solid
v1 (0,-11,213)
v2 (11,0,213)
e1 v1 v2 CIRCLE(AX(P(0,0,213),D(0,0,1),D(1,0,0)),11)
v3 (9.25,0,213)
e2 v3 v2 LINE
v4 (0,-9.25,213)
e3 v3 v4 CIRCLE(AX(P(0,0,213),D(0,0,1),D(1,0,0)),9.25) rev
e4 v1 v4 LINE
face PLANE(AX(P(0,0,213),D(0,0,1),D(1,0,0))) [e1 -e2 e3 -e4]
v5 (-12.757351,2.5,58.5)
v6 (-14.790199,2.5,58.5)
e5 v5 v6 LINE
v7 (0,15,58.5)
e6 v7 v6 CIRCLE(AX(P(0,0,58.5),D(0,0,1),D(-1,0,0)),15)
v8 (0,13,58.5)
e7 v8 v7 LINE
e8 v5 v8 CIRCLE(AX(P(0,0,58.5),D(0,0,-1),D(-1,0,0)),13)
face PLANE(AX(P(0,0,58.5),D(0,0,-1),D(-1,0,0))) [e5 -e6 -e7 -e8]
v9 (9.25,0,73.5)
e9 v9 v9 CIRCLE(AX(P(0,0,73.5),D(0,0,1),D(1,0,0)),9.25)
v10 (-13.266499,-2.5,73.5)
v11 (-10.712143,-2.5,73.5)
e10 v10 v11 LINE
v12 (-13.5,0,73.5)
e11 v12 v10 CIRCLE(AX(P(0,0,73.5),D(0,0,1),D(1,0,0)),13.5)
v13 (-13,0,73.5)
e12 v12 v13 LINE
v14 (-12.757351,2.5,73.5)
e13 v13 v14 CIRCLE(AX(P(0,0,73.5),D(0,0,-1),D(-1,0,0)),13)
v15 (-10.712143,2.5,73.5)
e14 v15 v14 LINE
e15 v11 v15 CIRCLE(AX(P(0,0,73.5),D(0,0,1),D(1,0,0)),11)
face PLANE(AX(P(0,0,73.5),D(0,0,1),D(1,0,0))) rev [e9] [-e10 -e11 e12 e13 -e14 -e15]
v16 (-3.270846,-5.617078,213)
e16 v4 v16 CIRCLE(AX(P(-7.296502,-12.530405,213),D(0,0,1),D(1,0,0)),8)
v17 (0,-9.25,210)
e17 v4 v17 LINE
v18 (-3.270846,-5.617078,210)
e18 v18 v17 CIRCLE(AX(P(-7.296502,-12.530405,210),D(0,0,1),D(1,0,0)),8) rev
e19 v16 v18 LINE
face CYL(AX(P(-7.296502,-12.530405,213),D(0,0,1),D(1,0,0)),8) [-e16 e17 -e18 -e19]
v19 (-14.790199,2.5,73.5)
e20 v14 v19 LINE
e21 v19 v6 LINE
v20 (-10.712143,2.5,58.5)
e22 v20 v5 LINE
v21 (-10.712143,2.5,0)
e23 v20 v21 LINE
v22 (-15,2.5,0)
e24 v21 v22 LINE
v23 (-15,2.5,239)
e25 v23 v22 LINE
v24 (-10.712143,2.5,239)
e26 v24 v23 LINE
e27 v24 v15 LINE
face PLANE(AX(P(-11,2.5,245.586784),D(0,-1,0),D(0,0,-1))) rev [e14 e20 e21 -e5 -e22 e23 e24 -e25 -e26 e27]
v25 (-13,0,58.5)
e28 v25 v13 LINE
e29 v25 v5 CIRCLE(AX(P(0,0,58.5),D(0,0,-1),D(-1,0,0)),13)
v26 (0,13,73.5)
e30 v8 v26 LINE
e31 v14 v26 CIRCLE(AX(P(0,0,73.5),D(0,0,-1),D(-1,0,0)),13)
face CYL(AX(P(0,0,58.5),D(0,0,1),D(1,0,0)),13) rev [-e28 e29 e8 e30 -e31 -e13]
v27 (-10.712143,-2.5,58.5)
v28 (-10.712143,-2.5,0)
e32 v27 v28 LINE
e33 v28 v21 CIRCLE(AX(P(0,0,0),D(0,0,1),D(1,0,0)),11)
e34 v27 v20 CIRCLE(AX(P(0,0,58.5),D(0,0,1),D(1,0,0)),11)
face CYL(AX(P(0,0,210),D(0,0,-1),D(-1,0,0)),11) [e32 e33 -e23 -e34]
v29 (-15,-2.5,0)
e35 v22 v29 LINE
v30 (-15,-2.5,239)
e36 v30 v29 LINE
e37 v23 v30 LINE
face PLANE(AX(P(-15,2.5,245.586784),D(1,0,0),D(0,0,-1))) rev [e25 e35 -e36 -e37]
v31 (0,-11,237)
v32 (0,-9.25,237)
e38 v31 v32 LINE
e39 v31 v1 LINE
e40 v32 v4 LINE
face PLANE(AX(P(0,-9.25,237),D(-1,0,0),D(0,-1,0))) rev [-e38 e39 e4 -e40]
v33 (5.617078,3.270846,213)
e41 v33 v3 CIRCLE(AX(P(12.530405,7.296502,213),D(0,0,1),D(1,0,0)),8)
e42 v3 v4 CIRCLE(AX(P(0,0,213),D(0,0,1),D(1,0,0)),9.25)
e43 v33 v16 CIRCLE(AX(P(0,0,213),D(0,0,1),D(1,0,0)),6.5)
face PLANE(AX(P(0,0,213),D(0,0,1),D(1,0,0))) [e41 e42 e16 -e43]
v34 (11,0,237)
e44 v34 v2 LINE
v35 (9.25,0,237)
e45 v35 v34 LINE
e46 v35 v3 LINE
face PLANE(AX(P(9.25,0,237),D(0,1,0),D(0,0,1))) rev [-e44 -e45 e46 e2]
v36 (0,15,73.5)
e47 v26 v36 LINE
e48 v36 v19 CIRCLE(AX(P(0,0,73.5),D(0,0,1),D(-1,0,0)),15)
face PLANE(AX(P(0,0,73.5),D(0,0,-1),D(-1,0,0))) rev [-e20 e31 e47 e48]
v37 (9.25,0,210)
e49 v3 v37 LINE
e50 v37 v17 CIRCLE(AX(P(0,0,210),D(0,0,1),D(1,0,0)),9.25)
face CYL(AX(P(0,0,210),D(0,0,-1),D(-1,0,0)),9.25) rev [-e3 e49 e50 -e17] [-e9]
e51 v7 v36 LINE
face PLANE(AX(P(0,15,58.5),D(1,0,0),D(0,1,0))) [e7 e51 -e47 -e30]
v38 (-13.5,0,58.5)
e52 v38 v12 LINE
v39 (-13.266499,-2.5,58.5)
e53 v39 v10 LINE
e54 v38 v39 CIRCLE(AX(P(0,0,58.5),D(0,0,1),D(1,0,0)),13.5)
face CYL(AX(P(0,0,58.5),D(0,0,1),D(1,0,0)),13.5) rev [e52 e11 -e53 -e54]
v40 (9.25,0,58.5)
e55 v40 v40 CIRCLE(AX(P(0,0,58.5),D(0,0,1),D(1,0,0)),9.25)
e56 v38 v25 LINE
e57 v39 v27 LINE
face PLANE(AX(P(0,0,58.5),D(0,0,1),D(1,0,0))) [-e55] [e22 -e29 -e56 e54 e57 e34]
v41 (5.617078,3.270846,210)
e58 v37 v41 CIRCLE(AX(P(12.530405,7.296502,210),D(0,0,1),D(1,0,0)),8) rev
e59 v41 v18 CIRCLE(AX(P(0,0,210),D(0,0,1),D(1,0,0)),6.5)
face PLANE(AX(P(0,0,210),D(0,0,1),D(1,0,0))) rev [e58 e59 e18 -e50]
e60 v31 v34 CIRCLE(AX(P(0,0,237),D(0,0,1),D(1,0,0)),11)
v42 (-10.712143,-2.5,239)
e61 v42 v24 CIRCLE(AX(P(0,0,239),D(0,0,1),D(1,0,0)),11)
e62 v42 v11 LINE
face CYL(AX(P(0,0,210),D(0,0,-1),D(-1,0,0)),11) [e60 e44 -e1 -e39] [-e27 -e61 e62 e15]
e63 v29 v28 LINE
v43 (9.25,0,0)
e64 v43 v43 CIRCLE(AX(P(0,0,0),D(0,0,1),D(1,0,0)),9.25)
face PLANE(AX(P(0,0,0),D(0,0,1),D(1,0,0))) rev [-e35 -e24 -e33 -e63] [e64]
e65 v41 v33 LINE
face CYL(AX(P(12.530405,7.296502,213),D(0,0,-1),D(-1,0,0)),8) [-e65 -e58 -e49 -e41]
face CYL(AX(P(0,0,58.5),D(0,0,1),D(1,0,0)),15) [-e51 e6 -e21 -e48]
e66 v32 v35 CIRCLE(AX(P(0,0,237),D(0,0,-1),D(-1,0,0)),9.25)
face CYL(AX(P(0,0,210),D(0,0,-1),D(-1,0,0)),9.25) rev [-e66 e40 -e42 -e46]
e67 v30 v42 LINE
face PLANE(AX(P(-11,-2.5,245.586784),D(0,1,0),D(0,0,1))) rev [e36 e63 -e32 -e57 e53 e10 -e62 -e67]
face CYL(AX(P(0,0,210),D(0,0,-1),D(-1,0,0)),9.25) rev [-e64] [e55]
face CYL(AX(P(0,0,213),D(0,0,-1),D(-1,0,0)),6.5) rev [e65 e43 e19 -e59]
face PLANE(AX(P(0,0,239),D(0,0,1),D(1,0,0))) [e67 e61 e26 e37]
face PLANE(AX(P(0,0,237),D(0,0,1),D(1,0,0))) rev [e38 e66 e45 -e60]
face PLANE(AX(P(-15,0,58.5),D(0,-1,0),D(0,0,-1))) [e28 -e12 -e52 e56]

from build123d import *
from build123d.topology import SkipClean

# Parameters (mm, degrees)
SCHIZZO1_R                    = 11
SCHIZZO1_R_2                  = 9.25
TUBO_DEPTH                    = 210
INGRESSOCAVI_DEPTH            = 27
SCHIZZO4_R                    = 11
SCHIZZO4_R_2                  = 6.5
FONDOCORSA_DEPTH              = 3
SCHIZZO5_R                    = 11
TAPPO_DEPTH                   = 2
BASEINFERIORE_DEPTH           = 239
SCHIZZO7_R                    = 13.5
TAGLIOANELLO_DEPTH            = 15
SUPPORTOANELLO_DEPTH          = 15
FACILITAZIONEUSCITACAVI_DEPTH = 3
RACCORDOFACILITAZIONECAVI_R   = 8


with BuildPart() as part:
    # Schizzo1 → Tubo (new body)
    with BuildSketch(Plane.XY):
        Circle(SCHIZZO1_R)
        Circle(SCHIZZO1_R_2, mode=Mode.SUBTRACT)
    extrude(amount=TUBO_DEPTH)

    # Schizzo2 → IngressoCavi (add)
    with BuildSketch(Plane.XY.offset(210)):
        with BuildLine():
            Line((0, -9.25), (0, -11))
            ThreePointArc((0, -11), (-7.778174593, 7.778174593), (11, 0))
            Line((11, 0), (9.25, 0))
            ThreePointArc((9.25, 0), (-6.540737726, 6.540737726), (0, -9.25))
        make_face()
    extrude(amount=INGRESSOCAVI_DEPTH)

    # Schizzo4 → FondoCorsa (add)
    with SkipClean():  # the faces are left unmerged after this step: merging them gives an invalid solid
        with BuildSketch(Plane.XY.offset(210)):
            Circle(SCHIZZO4_R)
            Circle(SCHIZZO4_R_2, mode=Mode.SUBTRACT)
        extrude(amount=FONDOCORSA_DEPTH)

    # Schizzo5 → Tappo (add)
    with SkipClean():  # the faces are left unmerged after this step: merging them gives an invalid solid
        with BuildSketch(Plane.XY.offset(237)):
            Circle(SCHIZZO5_R)
        extrude(amount=TAPPO_DEPTH)
    add(part.part.scale(1), mode=Mode.REPLACE)  # the faces are merged on a copy

    # Schizzo6 → BaseInferiore (add)
    with SkipClean():  # the faces are left unmerged after this step: merging them gives an invalid solid
        with BuildSketch(Plane.XY):
            Polygon((-11, 2.5), (-15, 2.5), (-15, -2.5), (-11, -2.5), (-10.712142643, -2.5), (-10.712142643, 2.5), align=None)
        extrude(amount=BASEINFERIORE_DEPTH)

    # Schizzo7 → TaglioAnello (cut)
    with BuildSketch(Plane.XY.offset(73.5)):
        Circle(SCHIZZO7_R)
    extrude(amount=-TAGLIOANELLO_DEPTH, mode=Mode.SUBTRACT)

    # Schizzo8 → SupportoAnello (add)
    with SkipClean():  # the faces are left unmerged after this step: merging them gives an invalid solid
        with BuildSketch(Plane.XY.offset(73.5)):
            with BuildLine():
                Line((0, 15), (0, 13))
                ThreePointArc((0, 13), (-9.192388155, 9.192388155), (-13, 0))
                Line((-13, 0), (-15, 0))
                ThreePointArc((-15, 0), (-10.606601718, 10.606601718), (0, 15))
            make_face()
        extrude(amount=-SUPPORTOANELLO_DEPTH)

    # Schizzo9 → FacilitazioneUscitaCavi (cut)
    with SkipClean():  # the faces are left unmerged after this step: merging them gives an invalid solid
        with BuildSketch(Plane(origin=(0, 0, 210), x_dir=(-1, 0, 0), z_dir=(0, 0, -1))):
            with BuildLine():
                Line((0, 0), (-9.25, 0))
                ThreePointArc((-9.25, 0), (-6.540737726, -6.540737726), (0, -9.25))
                Line((0, -9.25), (0, 0))
            make_face()
        extrude(amount=-FACILITAZIONEUSCITACAVI_DEPTH, mode=Mode.SUBTRACT)

    # RaccordoFacilitazioneCavi
    # the kernel refuses this fillet: 8 mm, written as the material it takes off along each edge
    with BuildSketch(Plane(origin=(6.5, 0, 201.530207244), x_dir=(1, 0, 0), z_dir=(0, 0, 1)), Plane(origin=(0, -6.5, 221.469792756), x_dir=(0, -1, 0), z_dir=(0, 0, -1))) as raccordofacilitazionecavi_piece_1:
        with BuildLine():
            CenterArc((6.030405405, 7.296501927), RACCORDOFACILITAZIONECAVI_R, 210.212403153, 35.579578639)
            Line((-0.882921715, 3.270845692), (-1.021188257, 3.190332567))
            ThreePointArc((-1.021188257, 3.190332567), (-0.379082322, 1.65226111), (-0.16, 0))
            Line((-0.16, 0), (0, -0.16))
            ThreePointArc((0, -0.16), (1.375, -0.16), (2.684391892, -0.145930039))
            Line((2.684391892, -0.145930039), (2.75, 0))
        make_face()
    extrude(amount=19.939585512, mode=Mode.SUBTRACT)


solid = part.part
